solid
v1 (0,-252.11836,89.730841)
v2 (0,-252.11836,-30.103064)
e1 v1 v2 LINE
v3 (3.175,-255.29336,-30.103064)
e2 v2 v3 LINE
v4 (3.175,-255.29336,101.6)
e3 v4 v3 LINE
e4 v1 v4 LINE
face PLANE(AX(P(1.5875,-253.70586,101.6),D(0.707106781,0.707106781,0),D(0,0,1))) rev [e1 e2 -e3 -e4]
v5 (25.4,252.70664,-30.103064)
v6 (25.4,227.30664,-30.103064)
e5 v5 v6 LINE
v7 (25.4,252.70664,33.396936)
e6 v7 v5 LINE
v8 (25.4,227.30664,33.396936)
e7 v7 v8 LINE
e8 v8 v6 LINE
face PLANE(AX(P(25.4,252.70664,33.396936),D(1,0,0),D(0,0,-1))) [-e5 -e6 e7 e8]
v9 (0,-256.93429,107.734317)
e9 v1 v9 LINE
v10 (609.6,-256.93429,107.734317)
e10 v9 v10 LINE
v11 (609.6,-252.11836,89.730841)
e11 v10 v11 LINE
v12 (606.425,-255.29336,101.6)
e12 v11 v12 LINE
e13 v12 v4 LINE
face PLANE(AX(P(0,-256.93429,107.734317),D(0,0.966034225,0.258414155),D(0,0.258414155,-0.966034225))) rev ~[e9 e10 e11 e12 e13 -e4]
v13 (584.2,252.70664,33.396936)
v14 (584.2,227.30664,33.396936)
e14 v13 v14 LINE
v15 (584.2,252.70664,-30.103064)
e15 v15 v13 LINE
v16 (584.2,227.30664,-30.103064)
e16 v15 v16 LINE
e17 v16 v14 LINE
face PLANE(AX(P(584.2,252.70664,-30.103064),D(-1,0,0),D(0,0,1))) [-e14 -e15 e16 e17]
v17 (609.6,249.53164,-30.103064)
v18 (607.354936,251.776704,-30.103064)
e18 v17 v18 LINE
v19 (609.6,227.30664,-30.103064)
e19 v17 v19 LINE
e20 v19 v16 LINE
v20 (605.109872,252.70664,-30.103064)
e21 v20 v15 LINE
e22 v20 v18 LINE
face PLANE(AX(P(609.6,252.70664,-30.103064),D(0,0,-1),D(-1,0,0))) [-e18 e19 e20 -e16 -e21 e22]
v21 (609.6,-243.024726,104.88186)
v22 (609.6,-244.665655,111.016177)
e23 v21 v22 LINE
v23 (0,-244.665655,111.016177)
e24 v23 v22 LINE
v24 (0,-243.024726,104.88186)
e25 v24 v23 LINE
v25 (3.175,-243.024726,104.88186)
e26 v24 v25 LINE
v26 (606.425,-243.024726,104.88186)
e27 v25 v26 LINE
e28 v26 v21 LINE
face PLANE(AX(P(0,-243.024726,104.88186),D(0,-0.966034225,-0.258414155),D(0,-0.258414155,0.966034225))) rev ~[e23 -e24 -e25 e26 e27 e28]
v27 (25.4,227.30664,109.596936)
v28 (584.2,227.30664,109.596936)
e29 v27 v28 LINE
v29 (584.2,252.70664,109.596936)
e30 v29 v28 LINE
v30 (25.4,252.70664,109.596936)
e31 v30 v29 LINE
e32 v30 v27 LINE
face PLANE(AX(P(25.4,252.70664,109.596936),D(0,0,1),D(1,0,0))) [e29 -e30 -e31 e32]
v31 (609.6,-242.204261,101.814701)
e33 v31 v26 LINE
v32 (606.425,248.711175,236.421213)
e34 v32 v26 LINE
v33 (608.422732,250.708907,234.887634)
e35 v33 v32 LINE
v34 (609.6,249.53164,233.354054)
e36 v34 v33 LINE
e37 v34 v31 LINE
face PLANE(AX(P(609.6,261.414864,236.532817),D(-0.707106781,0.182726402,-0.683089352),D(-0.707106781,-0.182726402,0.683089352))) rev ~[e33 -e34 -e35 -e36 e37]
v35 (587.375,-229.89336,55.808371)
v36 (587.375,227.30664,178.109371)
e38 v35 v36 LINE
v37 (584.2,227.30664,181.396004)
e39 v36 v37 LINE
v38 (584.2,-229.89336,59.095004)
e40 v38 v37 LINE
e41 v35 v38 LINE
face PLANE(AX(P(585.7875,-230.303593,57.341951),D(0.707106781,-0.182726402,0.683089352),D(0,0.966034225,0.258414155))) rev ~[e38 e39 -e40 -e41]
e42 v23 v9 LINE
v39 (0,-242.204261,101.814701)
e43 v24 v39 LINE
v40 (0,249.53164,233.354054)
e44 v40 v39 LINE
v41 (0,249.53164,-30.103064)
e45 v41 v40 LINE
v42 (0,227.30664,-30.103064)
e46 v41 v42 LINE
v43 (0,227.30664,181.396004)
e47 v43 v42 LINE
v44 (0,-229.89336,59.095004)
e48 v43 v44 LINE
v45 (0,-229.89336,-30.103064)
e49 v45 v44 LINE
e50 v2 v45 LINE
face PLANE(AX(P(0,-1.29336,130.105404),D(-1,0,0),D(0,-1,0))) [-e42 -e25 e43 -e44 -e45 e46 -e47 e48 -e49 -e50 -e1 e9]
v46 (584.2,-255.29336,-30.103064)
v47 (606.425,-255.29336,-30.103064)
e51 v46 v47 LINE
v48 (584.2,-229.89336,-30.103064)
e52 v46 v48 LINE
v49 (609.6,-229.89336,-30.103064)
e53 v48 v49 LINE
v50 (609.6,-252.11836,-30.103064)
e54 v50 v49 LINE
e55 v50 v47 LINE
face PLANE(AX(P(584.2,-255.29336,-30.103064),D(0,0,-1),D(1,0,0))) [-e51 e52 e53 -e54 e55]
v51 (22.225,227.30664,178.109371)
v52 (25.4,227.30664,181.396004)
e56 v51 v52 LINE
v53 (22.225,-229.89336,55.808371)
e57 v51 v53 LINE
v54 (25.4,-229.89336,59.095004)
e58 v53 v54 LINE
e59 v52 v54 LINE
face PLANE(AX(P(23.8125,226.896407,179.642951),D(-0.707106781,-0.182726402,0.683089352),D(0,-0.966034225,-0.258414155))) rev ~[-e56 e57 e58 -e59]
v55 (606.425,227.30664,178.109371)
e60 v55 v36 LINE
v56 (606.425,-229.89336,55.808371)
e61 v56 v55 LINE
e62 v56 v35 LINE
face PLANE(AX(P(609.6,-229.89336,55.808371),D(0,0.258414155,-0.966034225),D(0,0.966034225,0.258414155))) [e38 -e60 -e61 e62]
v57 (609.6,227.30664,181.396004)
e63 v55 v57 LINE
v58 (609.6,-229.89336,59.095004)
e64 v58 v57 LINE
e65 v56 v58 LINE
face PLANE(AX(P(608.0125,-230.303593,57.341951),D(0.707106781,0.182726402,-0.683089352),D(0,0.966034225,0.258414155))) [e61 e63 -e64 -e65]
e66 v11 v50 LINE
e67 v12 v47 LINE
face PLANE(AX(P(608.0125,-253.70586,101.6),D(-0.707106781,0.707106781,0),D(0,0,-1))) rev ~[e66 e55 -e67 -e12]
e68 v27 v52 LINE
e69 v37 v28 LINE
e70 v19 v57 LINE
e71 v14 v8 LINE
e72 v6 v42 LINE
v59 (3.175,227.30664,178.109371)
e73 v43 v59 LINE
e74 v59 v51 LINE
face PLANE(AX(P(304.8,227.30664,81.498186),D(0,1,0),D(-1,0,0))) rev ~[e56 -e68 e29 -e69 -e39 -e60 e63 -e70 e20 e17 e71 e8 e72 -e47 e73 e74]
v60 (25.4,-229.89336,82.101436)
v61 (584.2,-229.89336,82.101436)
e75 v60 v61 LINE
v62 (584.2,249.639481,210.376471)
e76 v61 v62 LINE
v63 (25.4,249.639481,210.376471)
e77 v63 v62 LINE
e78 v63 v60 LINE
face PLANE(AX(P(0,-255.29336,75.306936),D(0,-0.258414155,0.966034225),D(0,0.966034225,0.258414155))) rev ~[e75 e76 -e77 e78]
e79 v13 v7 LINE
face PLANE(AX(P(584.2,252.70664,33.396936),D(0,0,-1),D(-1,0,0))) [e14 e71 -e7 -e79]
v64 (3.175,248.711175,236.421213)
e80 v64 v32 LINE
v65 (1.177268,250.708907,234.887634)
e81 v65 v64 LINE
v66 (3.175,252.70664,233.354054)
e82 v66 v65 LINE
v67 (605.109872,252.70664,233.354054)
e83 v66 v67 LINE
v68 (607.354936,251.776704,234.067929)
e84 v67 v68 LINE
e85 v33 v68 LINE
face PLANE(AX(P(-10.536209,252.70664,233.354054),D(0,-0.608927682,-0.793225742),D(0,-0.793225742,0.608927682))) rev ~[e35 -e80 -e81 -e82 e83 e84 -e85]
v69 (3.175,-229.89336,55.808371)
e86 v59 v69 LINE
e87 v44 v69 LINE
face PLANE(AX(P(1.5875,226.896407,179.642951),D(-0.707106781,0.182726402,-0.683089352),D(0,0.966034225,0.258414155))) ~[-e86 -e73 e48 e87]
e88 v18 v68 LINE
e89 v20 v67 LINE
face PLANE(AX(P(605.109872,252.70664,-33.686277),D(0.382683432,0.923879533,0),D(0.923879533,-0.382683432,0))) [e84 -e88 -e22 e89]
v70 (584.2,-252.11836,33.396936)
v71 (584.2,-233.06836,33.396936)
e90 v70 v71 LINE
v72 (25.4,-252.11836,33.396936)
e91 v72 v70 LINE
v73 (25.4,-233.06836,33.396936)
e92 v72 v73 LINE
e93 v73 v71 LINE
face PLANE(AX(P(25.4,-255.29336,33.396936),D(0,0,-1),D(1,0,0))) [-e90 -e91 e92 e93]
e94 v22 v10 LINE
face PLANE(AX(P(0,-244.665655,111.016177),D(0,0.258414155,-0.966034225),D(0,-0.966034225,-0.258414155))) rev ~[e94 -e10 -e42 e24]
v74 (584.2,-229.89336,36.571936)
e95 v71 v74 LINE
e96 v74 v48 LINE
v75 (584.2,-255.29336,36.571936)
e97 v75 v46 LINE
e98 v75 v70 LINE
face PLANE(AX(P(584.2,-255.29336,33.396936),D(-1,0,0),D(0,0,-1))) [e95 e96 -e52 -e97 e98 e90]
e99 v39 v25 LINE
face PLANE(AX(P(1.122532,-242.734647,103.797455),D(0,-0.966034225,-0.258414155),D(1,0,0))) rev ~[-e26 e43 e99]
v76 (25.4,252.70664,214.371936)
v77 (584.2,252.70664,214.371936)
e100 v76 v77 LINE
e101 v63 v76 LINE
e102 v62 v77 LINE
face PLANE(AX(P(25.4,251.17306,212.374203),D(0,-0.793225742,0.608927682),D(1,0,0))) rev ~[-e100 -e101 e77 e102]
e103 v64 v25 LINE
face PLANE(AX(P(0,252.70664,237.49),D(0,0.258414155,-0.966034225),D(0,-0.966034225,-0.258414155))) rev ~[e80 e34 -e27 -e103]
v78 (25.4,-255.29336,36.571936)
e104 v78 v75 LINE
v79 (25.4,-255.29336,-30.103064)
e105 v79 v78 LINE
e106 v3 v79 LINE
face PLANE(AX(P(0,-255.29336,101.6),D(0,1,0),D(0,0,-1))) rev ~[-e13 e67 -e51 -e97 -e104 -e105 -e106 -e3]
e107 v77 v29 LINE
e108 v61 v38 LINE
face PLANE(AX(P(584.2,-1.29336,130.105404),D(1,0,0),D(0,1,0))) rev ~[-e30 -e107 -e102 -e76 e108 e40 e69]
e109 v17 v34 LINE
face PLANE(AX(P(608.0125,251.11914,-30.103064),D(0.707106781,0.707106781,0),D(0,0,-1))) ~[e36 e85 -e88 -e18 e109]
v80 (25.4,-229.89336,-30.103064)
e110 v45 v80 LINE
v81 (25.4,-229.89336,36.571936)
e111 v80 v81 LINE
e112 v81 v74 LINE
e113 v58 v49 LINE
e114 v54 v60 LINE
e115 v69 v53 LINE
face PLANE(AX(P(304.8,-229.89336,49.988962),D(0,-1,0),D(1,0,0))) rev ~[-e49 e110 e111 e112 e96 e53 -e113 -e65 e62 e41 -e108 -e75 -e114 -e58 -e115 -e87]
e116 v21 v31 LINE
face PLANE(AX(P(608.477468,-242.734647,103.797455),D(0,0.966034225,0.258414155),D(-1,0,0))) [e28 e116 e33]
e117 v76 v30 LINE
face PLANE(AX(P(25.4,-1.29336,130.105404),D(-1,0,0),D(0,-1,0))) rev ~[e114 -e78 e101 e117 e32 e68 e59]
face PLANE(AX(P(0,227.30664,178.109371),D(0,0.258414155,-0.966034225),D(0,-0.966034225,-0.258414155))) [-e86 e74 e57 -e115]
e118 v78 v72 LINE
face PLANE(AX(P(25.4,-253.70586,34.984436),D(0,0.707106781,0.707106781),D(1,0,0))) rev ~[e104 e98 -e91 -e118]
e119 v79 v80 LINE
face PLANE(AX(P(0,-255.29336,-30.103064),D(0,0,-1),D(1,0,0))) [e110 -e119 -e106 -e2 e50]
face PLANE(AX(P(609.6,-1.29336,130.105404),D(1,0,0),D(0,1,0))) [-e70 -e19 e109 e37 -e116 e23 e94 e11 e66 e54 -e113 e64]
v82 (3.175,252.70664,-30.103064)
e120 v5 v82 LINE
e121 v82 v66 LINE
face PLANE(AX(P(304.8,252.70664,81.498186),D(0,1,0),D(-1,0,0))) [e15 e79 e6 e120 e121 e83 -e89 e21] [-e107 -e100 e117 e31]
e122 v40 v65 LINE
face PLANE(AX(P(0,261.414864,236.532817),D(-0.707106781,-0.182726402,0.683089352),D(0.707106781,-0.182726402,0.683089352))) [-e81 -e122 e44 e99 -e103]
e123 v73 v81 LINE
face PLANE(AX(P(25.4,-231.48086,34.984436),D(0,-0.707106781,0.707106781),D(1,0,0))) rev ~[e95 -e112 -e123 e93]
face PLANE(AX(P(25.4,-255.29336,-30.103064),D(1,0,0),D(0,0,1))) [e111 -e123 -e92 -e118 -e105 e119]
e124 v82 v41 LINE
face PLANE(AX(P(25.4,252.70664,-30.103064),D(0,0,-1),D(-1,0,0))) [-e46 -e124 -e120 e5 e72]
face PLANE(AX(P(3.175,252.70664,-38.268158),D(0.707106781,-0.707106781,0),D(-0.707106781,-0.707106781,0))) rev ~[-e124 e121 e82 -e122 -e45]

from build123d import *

# Parameters (mm, degrees)
F1_DEPTH     = 609.6
F3_DEPTH     = 25.4
F5_DEPTH     = 25.4
F7_DEPTH     = 25.4
F9_DEPTH     = 25.4
F10_T1_DEPTH = 521.3263794739
F10_T3_DEPTH = 630.6724176283
F11_SIZE     = 3.175
F12_T1_DEPTH = 279.7873057355
F12_T3_DEPTH = 270.6235437243
F13_SIZE     = 3.175
F14_SIZE     = 3.175


# Not quite as in the source:
# - a fillet or chamfer that OpenCascade refuses, or shapes differently, is made with other operations: its cross-section is extruded or revolved along the edge and cut away or added


with BuildPart() as f1:
    # F0 (on Right) → F1 (new body)
    with BuildSketch(Plane.YZ):
        Polygon((252.7066397959, 237.49), (-243.0247255434, 104.8818597717), (-244.6656554292, 111.0161771021), (-256.93429009, 107.7343173304), (-255.2933602041, 101.6), (-255.2933602041, 75.3069357006), (252.7066397959, 211.1969357006), align=None)
    extrude(amount=F1_DEPTH)

    # F2 (on face) → F3 (join)
    with BuildSketch(Plane(origin=(0, 252.7066397959, 0), x_dir=(-1, 0, 0), z_dir=(0, 1, 0))):
        Polygon((-609.6, 211.1969357006), (-609.6, -30.1030642994), (-584.2, -30.1030642994), (-584.2, 33.3969357006), (-25.4, 33.3969357006), (-25.4, -30.1030642994), (0, -30.1030642994), (0, 211.1969357006), (-25.4, 211.1969357006), (-25.4, 109.5969357006), (-584.2, 109.5969357006), (-584.2, 211.1969357006), align=None)
    extrude(amount=-F3_DEPTH)

    # F4 (on face) → F5 (join)
    with BuildSketch(Plane.XZ.offset(255.2933602041)):
        Polygon((25.4, 101.6), (0, 101.6), (0, -30.1030642994), (25.4, -30.1030642994), (25.4, 33.3969357006), (584.2, 33.3969357006), (584.2, -30.1030642994), (609.6, -30.1030642994), (609.6, 101.6), (584.2, 101.6), (584.2, 84.1969357006), (25.4, 84.1969357006), align=None)
    extrude(amount=-F5_DEPTH)

    # F6 (on face) → F7 (join)
    with BuildSketch(Plane(origin=(0, 0, 0), x_dir=(0, -1, 0), z_dir=(-1, 0, 0))):
        Polygon((229.8933602041, 82.1014357006), (-227.3066397959, 204.4024357006), (-227.3066397959, 178.1093714013), (229.8933602041, 55.8083714013), align=None)
    extrude(amount=-F7_DEPTH)

    # F8 (on face) → F9 (join)
    with BuildSketch(Plane.YZ.offset(609.6)):
        Polygon((227.3066397959, 204.4024357006), (-229.8933602041, 82.1014357006), (-229.8933602041, 55.8083714013), (227.3066397959, 178.1093714013), align=None)
    extrude(amount=-F9_DEPTH)

    # F10: chamfer of 3.175 on 3 edges, made by hand

    # F10_s2 → F10_t1 (cut)
    with BuildSketch(Plane(origin=(0, 303.005458711, 81.0539602052), x_dir=(1, 0, 0), z_dir=(0, -0.9660342253, -0.2584141553))):
        Polygon((0, 160.9454953054), (3.175, 164.1204953054), (0, 164.1204953054), align=None)
        Polygon((609.6, 160.9454953054), (606.425, 164.1204953054), (609.6, 164.1204953054), align=None)
    extrude(amount=F10_T1_DEPTH, mode=Mode.SUBTRACT)

    # F10_s4 → F10_t3 (cut)
    with BuildSketch(Plane.YZ.offset(-10.5362088142)):
        Polygon((252.7066397959, 233.3540544626), (248.711174853, 236.4212131278), (252.7066397959, 237.49), align=None)
    extrude(amount=F10_T3_DEPTH, mode=Mode.SUBTRACT)

    # F11
    f11_edges = [f1.edges().sort_by_distance(p)[0] for p in [
        (609.6, -1.29336, 116.958871),
        (584.2, -1.29336, 116.958871),
        (25.4, -1.29336, 116.958871),
        (0, -1.29336, 116.958871),
        (609.6, -255.29336, 35.748468),
        (609.6, 252.70664, 101.625495),
        (0, -255.29336, 35.748468),
    ]]
    chamfer(f11_edges, length=F11_SIZE)

    # F12: chamfer of 3.175 on 2 edges, made by hand

    # F12_s2 → F12_t1 (cut)
    with BuildSketch(Plane.XY.offset(-38.2681577861)):
        Polygon((3.175, 252.7066397959), (0, 249.5316397959), (0, 252.7066397959), align=None)
    extrude(amount=F12_T1_DEPTH, mode=Mode.SUBTRACT)

    # F12_s4 → F12_t3 (cut)
    with BuildSketch(Plane.XY.offset(-33.6862767805)):
        Polygon((605.1098719395, 252.7066397959), (607.3549359697, 251.7767038262), (606.425, 252.7066397959), align=None)
    extrude(amount=F12_T3_DEPTH, mode=Mode.SUBTRACT)

    # F13
    f13_edges = [f1.edges().sort_by_distance(p)[0] for p in [
        (304.8, 252.70664, 211.196936),
    ]]
    chamfer(f13_edges, length=F13_SIZE)

    # F14
    f14_edges = [f1.edges().sort_by_distance(p)[0] for p in [
        (304.8, -255.29336, 33.396936),
        (304.8, -229.89336, 33.396936),
    ]]
    chamfer(f14_edges, length=F14_SIZE)


solid = f1.part
